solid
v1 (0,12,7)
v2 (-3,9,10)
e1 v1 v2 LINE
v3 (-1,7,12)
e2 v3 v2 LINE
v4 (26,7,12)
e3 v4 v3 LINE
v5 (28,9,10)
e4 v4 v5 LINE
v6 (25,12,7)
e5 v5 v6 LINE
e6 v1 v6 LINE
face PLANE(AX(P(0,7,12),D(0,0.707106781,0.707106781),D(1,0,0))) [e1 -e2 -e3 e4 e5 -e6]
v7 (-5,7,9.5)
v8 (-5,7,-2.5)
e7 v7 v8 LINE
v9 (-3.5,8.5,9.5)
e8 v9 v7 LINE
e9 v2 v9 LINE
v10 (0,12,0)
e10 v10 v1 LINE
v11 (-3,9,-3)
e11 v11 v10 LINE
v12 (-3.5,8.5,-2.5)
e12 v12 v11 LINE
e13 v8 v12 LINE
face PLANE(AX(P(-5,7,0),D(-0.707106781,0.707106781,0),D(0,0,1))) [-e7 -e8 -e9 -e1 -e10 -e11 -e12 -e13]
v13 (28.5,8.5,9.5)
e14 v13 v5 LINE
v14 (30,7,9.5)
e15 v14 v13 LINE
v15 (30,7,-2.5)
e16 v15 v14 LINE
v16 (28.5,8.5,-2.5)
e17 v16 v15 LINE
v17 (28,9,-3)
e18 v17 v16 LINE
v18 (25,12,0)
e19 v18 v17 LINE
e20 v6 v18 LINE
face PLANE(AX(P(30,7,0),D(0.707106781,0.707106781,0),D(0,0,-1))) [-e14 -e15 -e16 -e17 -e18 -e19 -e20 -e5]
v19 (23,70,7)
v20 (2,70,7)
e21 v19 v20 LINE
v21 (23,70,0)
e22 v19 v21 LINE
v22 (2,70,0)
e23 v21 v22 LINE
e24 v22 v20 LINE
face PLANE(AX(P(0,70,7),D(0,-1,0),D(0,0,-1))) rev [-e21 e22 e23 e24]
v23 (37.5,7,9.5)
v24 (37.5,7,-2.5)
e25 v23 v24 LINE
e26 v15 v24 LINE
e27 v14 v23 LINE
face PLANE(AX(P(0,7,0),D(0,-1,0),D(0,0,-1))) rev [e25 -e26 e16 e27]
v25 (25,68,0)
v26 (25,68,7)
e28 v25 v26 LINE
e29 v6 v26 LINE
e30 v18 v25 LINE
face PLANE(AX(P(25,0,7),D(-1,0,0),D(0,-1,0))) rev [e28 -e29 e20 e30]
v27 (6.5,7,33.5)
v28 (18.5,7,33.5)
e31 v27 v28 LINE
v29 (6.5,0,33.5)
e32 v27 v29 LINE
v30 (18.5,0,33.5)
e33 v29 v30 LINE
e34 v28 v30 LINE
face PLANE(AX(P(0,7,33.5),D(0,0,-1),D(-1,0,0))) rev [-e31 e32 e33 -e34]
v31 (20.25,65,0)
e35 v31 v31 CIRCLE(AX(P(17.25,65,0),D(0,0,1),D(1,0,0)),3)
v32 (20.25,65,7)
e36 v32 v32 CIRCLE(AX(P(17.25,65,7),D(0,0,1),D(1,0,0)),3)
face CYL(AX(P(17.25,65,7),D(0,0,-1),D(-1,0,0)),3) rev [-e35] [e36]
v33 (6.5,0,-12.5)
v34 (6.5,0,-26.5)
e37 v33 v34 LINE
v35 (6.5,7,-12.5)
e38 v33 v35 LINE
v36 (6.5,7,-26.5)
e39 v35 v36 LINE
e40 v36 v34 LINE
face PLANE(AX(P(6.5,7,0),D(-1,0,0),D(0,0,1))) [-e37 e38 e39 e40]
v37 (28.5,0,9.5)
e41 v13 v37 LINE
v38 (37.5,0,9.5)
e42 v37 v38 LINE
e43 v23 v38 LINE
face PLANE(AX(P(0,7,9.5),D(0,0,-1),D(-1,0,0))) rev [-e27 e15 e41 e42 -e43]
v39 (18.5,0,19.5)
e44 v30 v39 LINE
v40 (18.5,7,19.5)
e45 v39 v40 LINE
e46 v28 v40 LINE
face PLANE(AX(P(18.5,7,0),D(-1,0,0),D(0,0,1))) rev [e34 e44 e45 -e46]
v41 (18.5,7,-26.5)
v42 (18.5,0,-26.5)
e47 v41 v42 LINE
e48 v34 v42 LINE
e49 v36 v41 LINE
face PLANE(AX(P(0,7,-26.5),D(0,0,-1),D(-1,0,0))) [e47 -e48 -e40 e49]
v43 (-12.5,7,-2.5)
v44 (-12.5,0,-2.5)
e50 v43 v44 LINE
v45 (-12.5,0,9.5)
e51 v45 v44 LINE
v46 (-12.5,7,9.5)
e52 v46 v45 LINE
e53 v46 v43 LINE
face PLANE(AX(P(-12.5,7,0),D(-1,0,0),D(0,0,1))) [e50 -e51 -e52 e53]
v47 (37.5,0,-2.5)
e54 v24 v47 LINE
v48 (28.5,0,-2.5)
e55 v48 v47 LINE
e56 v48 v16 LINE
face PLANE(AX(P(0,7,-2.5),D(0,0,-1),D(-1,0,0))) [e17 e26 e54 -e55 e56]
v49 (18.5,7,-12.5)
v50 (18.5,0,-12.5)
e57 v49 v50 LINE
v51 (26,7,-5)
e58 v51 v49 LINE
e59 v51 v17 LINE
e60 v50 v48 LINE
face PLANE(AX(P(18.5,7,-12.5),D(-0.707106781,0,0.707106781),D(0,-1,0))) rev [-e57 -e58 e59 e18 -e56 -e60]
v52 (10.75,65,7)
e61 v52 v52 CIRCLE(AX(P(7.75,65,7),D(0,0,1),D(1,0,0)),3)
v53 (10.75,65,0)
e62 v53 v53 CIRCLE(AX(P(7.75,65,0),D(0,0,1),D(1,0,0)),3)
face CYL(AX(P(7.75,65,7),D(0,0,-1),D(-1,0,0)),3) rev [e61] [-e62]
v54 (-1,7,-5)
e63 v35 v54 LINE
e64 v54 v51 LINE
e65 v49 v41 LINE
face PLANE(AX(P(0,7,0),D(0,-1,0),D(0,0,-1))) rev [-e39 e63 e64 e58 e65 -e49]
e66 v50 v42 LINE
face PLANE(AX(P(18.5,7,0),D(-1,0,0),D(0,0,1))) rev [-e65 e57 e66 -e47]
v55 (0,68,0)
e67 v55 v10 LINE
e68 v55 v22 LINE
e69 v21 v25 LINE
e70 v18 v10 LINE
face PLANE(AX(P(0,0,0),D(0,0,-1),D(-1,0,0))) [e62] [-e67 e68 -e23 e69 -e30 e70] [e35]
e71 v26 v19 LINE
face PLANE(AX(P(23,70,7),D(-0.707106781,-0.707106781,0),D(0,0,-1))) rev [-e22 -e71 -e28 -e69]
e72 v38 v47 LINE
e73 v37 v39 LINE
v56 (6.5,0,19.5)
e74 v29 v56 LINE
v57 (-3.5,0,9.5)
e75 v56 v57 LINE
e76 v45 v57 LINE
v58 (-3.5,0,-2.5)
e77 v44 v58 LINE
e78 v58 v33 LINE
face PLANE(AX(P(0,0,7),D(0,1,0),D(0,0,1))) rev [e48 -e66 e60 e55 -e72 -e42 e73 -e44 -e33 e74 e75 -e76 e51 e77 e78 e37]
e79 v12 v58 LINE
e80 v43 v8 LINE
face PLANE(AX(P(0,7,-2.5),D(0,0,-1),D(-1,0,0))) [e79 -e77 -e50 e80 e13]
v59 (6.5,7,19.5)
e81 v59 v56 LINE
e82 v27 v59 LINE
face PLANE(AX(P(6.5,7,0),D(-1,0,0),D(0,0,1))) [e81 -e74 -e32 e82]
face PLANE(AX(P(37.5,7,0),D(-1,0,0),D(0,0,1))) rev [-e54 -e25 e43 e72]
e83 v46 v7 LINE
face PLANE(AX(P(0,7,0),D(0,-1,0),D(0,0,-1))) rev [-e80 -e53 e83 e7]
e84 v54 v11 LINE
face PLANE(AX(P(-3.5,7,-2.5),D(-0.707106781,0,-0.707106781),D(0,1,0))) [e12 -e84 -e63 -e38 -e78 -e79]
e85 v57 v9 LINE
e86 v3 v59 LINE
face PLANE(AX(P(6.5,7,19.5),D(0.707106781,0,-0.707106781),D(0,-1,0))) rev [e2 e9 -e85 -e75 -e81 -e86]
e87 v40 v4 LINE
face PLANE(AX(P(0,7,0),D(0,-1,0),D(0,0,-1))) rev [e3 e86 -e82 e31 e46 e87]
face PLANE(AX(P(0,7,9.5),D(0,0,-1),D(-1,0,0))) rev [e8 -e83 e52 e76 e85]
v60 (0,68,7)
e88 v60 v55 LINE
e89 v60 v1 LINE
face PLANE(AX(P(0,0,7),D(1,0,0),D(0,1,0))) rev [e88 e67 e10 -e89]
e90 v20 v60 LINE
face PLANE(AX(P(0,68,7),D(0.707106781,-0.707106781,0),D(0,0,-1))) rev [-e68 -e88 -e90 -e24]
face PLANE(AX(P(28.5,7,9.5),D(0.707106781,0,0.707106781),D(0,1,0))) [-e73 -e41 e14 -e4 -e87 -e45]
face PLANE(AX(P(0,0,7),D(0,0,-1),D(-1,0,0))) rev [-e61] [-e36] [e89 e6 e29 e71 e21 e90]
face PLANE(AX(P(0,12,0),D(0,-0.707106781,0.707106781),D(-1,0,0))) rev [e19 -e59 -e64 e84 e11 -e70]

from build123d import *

# Parameters (mm, degrees)
SKETCH1_W           = 25
SKETCH1_H           = 70
SKETCH1_R           = 3
BOSS_EXTRUDE1_DEPTH = 7
SKETCH2_W           = 12
SKETCH2_H           = 24
SKETCH2_H_2         = 7
SKETCH2_W_2         = 6.5
SKETCH2_H_3         = 2.5
BOSS_EXTRUDE2_DEPTH = 7
CHAMFER2_SIZE       = 10
CHAMFER3_SIZE       = 5
CHAMFER4_SIZE       = 5
CHAMFER5_SIZE       = 2


with BuildPart() as part:
    # Sketch1 → Boss-Extrude1 (new body)
    with BuildSketch(Plane.XY):
        with Locations((12.5, 35)):
            Rectangle(SKETCH1_W, SKETCH1_H)
        with Locations((7.75, 65)):
            Circle(SKETCH1_R, mode=Mode.SUBTRACT)
        with Locations((17.25, 65)):
            Circle(SKETCH1_R, mode=Mode.SUBTRACT)
    extrude(amount=BOSS_EXTRUDE1_DEPTH)

    # Sketch2 → Boss-Extrude2 (add)
    with BuildSketch(Plane.XZ):
        with Locations((12.5, 21.5)):
            Rectangle(SKETCH2_W, SKETCH2_H)
        Polygon((6.5, 7), (6.5, 9.5), (-12.5, 9.5), (-12.5, -2.5), (6.5, -2.5), (6.5, 0), (0, 0), (0, 7), align=None)
        with Locations((12.5, 3.5)):
            Rectangle(SKETCH2_W, SKETCH2_H_2)
        Polygon((37.5, 9.5), (18.5, 9.5), (18.5, 7), (25, 7), (25, 0), (18.5, 0), (18.5, -2.5), (37.5, -2.5), align=None)
        with Locations((12.5, -14.5)):
            Rectangle(SKETCH2_W, SKETCH2_H)
        with Locations((3.25, 3.5)):
            Rectangle(SKETCH2_W_2, SKETCH2_H_2)
        with Locations((12.5, 8.25)):
            Rectangle(SKETCH2_W, SKETCH2_H_3)
        with Locations((12.5, -1.25)):
            Rectangle(SKETCH2_W, SKETCH2_H_3)
        with Locations((21.75, 3.5)):
            Rectangle(SKETCH2_W_2, SKETCH2_H_2)
    extrude(amount=-BOSS_EXTRUDE2_DEPTH)

    # Chamfer2
    chamfer2_edges = [part.edges().sort_by_distance(p)[0] for p in [
        (18.5, 3.5, 9.5),
        (18.5, 3.5, -2.5),
        (6.5, 3.5, -2.5),
        (6.5, 3.5, 9.5),
    ]]
    chamfer(chamfer2_edges, length=CHAMFER2_SIZE)

    # Chamfer3
    chamfer3_edges = [part.edges().sort_by_distance(p)[0] for p in [
        (12.5, 7, 7),
        (12.5, 7, 0),
    ]]
    chamfer(chamfer3_edges, length=CHAMFER3_SIZE)

    # Chamfer4
    # the kernel refuses this chamfer: 5 mm, written as the material it adds along each edge
    with BuildSketch(Plane(origin=(25, 7, -17.85841494), x_dir=(0.9996219169112968, -0.027495876610586317, 0), z_dir=(0, 0, 1))) as chamfer4_piece_1_section:
        Polygon((CHAMFER4_SIZE * 0.999621916911, CHAMFER4_SIZE * 0.0274958766106), (-CHAMFER4_SIZE * 0.0274958766106, CHAMFER4_SIZE * 0.999621916911), (0, 0), align=None)
    chamfer4_piece_1 = extrude(amount=42.71682988, mode=Mode.PRIVATE)
    chamfer4_piece_1 = split(chamfer4_piece_1, bisect_by=Plane(origin=(26.380997475, 7.88604798, 9.5), z_dir=(0, 0, -1)), keep=Keep.TOP, mode=Mode.PRIVATE)
    chamfer4_piece_1 = split(chamfer4_piece_1, bisect_by=Plane(origin=(27.086016414, 7.88604798, -3.913983586), z_dir=(-0.7071067811865475, 0, 0.7071067811865477)), keep=Keep.TOP, mode=Mode.PRIVATE)
    chamfer4_piece_1 = split(chamfer4_piece_1, bisect_by=Plane(origin=(26.380997475, 8.338541667, -3.661458333), z_dir=(0, -0.7071067811865476, 0.7071067811865476)), keep=Keep.TOP, mode=Mode.PRIVATE)
    chamfer4_piece_1 = split(chamfer4_piece_1, bisect_by=Plane(origin=(26.380997475, 15.047506313, 3.952493687), z_dir=(0, -0.7071067811865476, -0.7071067811865476)), keep=Keep.TOP, mode=Mode.PRIVATE)
    add(chamfer4_piece_1)
    with BuildSketch(Plane(origin=(25, 7, -17.85841494), x_dir=(0.9996219169112968, -0.027495876610586317, 0), z_dir=(0, 0, 1))) as chamfer4_piece_2_section:
        Polygon((CHAMFER4_SIZE * 0.999621916911, CHAMFER4_SIZE * 0.0274958766106), (-CHAMFER4_SIZE * 0.0274958766106, CHAMFER4_SIZE * 0.999621916911), (0, 0), align=None)
    chamfer4_piece_2 = extrude(amount=42.71682988, mode=Mode.PRIVATE)
    chamfer4_piece_2 = split(chamfer4_piece_2, bisect_by=Plane(origin=(34.6875, 7.375, 3.3125), z_dir=(-0.7071067811865475, 0, -0.7071067811865477)), keep=Keep.TOP, mode=Mode.PRIVATE)
    chamfer4_piece_2 = split(chamfer4_piece_2, bisect_by=Plane(origin=(29.25, 7.375, -2.5), z_dir=(0, 0, 1)), keep=Keep.TOP, mode=Mode.PRIVATE)
    chamfer4_piece_2 = split(chamfer4_piece_2, bisect_by=Plane(origin=(29.25, 8.625, -3.375), z_dir=(0, -0.7071067811865476, 0.7071067811865476)), keep=Keep.TOP, mode=Mode.PRIVATE)
    chamfer4_piece_2 = split(chamfer4_piece_2, bisect_by=Plane(origin=(29.25, 14.25, 4.75), z_dir=(0, -0.7071067811865476, -0.7071067811865476)), keep=Keep.TOP, mode=Mode.PRIVATE)
    add(chamfer4_piece_2)
    with BuildSketch(Plane(origin=(0, 7, 24.85841494), x_dir=(-0.9996219169112968, -0.027495876610586317, 0), z_dir=(0, 0, -1))) as chamfer4_piece_3_section:
        Polygon((CHAMFER4_SIZE * 0.999621916911, CHAMFER4_SIZE * 0.0274958766106), (-CHAMFER4_SIZE * 0.0274958766106, CHAMFER4_SIZE * 0.999621916911), (0, 0), align=None)
    chamfer4_piece_3 = extrude(amount=42.71682988, mode=Mode.PRIVATE)
    chamfer4_piece_3 = split(chamfer4_piece_3, bisect_by=Plane(origin=(-2.086016414, 7.88604798, 10.913983586), z_dir=(0.7071067811865477, 0, -0.7071067811865475)), keep=Keep.TOP, mode=Mode.PRIVATE)
    chamfer4_piece_3 = split(chamfer4_piece_3, bisect_by=Plane(origin=(-1.380997475, 7.88604798, -2.5), z_dir=(0, 0, 1)), keep=Keep.TOP, mode=Mode.PRIVATE)
    chamfer4_piece_3 = split(chamfer4_piece_3, bisect_by=Plane(origin=(-1.380997475, 15.047506313, 3.047506313), z_dir=(0, -0.7071067811865476, 0.7071067811865476)), keep=Keep.TOP, mode=Mode.PRIVATE)
    chamfer4_piece_3 = split(chamfer4_piece_3, bisect_by=Plane(origin=(-1.380997475, 8.338541667, 10.661458333), z_dir=(0, -0.7071067811865476, -0.7071067811865476)), keep=Keep.TOP, mode=Mode.PRIVATE)
    add(chamfer4_piece_3)
    with BuildSketch(Plane(origin=(0, 7, 24.85841494), x_dir=(-0.9996219169112968, -0.027495876610586317, 0), z_dir=(0, 0, -1))) as chamfer4_piece_4_section:
        Polygon((CHAMFER4_SIZE * 0.999621916911, CHAMFER4_SIZE * 0.0274958766106), (-CHAMFER4_SIZE * 0.0274958766106, CHAMFER4_SIZE * 0.999621916911), (0, 0), align=None)
    chamfer4_piece_4 = extrude(amount=42.71682988, mode=Mode.PRIVATE)
    chamfer4_piece_4 = split(chamfer4_piece_4, bisect_by=Plane(origin=(-4.25, 7.375, 9.5), z_dir=(0, 0, -1)), keep=Keep.TOP, mode=Mode.PRIVATE)
    chamfer4_piece_4 = split(chamfer4_piece_4, bisect_by=Plane(origin=(-9.6875, 7.375, 3.6875), z_dir=(0.7071067811865476, 0, 0.7071067811865475)), keep=Keep.TOP, mode=Mode.PRIVATE)
    chamfer4_piece_4 = split(chamfer4_piece_4, bisect_by=Plane(origin=(-4.25, 14.25, 2.25), z_dir=(0, -0.7071067811865476, 0.7071067811865476)), keep=Keep.TOP, mode=Mode.PRIVATE)
    chamfer4_piece_4 = split(chamfer4_piece_4, bisect_by=Plane(origin=(-4.25, 8.625, 10.375), z_dir=(0, -0.7071067811865476, -0.7071067811865476)), keep=Keep.TOP, mode=Mode.PRIVATE)
    add(chamfer4_piece_4)

    # Chamfer5
    chamfer5_edges = [part.edges().sort_by_distance(p)[0] for p in [
        (0, 70, 3.5),
        (25, 70, 3.5),
    ]]
    chamfer(chamfer5_edges, length=CHAMFER5_SIZE)


solid = part.part
